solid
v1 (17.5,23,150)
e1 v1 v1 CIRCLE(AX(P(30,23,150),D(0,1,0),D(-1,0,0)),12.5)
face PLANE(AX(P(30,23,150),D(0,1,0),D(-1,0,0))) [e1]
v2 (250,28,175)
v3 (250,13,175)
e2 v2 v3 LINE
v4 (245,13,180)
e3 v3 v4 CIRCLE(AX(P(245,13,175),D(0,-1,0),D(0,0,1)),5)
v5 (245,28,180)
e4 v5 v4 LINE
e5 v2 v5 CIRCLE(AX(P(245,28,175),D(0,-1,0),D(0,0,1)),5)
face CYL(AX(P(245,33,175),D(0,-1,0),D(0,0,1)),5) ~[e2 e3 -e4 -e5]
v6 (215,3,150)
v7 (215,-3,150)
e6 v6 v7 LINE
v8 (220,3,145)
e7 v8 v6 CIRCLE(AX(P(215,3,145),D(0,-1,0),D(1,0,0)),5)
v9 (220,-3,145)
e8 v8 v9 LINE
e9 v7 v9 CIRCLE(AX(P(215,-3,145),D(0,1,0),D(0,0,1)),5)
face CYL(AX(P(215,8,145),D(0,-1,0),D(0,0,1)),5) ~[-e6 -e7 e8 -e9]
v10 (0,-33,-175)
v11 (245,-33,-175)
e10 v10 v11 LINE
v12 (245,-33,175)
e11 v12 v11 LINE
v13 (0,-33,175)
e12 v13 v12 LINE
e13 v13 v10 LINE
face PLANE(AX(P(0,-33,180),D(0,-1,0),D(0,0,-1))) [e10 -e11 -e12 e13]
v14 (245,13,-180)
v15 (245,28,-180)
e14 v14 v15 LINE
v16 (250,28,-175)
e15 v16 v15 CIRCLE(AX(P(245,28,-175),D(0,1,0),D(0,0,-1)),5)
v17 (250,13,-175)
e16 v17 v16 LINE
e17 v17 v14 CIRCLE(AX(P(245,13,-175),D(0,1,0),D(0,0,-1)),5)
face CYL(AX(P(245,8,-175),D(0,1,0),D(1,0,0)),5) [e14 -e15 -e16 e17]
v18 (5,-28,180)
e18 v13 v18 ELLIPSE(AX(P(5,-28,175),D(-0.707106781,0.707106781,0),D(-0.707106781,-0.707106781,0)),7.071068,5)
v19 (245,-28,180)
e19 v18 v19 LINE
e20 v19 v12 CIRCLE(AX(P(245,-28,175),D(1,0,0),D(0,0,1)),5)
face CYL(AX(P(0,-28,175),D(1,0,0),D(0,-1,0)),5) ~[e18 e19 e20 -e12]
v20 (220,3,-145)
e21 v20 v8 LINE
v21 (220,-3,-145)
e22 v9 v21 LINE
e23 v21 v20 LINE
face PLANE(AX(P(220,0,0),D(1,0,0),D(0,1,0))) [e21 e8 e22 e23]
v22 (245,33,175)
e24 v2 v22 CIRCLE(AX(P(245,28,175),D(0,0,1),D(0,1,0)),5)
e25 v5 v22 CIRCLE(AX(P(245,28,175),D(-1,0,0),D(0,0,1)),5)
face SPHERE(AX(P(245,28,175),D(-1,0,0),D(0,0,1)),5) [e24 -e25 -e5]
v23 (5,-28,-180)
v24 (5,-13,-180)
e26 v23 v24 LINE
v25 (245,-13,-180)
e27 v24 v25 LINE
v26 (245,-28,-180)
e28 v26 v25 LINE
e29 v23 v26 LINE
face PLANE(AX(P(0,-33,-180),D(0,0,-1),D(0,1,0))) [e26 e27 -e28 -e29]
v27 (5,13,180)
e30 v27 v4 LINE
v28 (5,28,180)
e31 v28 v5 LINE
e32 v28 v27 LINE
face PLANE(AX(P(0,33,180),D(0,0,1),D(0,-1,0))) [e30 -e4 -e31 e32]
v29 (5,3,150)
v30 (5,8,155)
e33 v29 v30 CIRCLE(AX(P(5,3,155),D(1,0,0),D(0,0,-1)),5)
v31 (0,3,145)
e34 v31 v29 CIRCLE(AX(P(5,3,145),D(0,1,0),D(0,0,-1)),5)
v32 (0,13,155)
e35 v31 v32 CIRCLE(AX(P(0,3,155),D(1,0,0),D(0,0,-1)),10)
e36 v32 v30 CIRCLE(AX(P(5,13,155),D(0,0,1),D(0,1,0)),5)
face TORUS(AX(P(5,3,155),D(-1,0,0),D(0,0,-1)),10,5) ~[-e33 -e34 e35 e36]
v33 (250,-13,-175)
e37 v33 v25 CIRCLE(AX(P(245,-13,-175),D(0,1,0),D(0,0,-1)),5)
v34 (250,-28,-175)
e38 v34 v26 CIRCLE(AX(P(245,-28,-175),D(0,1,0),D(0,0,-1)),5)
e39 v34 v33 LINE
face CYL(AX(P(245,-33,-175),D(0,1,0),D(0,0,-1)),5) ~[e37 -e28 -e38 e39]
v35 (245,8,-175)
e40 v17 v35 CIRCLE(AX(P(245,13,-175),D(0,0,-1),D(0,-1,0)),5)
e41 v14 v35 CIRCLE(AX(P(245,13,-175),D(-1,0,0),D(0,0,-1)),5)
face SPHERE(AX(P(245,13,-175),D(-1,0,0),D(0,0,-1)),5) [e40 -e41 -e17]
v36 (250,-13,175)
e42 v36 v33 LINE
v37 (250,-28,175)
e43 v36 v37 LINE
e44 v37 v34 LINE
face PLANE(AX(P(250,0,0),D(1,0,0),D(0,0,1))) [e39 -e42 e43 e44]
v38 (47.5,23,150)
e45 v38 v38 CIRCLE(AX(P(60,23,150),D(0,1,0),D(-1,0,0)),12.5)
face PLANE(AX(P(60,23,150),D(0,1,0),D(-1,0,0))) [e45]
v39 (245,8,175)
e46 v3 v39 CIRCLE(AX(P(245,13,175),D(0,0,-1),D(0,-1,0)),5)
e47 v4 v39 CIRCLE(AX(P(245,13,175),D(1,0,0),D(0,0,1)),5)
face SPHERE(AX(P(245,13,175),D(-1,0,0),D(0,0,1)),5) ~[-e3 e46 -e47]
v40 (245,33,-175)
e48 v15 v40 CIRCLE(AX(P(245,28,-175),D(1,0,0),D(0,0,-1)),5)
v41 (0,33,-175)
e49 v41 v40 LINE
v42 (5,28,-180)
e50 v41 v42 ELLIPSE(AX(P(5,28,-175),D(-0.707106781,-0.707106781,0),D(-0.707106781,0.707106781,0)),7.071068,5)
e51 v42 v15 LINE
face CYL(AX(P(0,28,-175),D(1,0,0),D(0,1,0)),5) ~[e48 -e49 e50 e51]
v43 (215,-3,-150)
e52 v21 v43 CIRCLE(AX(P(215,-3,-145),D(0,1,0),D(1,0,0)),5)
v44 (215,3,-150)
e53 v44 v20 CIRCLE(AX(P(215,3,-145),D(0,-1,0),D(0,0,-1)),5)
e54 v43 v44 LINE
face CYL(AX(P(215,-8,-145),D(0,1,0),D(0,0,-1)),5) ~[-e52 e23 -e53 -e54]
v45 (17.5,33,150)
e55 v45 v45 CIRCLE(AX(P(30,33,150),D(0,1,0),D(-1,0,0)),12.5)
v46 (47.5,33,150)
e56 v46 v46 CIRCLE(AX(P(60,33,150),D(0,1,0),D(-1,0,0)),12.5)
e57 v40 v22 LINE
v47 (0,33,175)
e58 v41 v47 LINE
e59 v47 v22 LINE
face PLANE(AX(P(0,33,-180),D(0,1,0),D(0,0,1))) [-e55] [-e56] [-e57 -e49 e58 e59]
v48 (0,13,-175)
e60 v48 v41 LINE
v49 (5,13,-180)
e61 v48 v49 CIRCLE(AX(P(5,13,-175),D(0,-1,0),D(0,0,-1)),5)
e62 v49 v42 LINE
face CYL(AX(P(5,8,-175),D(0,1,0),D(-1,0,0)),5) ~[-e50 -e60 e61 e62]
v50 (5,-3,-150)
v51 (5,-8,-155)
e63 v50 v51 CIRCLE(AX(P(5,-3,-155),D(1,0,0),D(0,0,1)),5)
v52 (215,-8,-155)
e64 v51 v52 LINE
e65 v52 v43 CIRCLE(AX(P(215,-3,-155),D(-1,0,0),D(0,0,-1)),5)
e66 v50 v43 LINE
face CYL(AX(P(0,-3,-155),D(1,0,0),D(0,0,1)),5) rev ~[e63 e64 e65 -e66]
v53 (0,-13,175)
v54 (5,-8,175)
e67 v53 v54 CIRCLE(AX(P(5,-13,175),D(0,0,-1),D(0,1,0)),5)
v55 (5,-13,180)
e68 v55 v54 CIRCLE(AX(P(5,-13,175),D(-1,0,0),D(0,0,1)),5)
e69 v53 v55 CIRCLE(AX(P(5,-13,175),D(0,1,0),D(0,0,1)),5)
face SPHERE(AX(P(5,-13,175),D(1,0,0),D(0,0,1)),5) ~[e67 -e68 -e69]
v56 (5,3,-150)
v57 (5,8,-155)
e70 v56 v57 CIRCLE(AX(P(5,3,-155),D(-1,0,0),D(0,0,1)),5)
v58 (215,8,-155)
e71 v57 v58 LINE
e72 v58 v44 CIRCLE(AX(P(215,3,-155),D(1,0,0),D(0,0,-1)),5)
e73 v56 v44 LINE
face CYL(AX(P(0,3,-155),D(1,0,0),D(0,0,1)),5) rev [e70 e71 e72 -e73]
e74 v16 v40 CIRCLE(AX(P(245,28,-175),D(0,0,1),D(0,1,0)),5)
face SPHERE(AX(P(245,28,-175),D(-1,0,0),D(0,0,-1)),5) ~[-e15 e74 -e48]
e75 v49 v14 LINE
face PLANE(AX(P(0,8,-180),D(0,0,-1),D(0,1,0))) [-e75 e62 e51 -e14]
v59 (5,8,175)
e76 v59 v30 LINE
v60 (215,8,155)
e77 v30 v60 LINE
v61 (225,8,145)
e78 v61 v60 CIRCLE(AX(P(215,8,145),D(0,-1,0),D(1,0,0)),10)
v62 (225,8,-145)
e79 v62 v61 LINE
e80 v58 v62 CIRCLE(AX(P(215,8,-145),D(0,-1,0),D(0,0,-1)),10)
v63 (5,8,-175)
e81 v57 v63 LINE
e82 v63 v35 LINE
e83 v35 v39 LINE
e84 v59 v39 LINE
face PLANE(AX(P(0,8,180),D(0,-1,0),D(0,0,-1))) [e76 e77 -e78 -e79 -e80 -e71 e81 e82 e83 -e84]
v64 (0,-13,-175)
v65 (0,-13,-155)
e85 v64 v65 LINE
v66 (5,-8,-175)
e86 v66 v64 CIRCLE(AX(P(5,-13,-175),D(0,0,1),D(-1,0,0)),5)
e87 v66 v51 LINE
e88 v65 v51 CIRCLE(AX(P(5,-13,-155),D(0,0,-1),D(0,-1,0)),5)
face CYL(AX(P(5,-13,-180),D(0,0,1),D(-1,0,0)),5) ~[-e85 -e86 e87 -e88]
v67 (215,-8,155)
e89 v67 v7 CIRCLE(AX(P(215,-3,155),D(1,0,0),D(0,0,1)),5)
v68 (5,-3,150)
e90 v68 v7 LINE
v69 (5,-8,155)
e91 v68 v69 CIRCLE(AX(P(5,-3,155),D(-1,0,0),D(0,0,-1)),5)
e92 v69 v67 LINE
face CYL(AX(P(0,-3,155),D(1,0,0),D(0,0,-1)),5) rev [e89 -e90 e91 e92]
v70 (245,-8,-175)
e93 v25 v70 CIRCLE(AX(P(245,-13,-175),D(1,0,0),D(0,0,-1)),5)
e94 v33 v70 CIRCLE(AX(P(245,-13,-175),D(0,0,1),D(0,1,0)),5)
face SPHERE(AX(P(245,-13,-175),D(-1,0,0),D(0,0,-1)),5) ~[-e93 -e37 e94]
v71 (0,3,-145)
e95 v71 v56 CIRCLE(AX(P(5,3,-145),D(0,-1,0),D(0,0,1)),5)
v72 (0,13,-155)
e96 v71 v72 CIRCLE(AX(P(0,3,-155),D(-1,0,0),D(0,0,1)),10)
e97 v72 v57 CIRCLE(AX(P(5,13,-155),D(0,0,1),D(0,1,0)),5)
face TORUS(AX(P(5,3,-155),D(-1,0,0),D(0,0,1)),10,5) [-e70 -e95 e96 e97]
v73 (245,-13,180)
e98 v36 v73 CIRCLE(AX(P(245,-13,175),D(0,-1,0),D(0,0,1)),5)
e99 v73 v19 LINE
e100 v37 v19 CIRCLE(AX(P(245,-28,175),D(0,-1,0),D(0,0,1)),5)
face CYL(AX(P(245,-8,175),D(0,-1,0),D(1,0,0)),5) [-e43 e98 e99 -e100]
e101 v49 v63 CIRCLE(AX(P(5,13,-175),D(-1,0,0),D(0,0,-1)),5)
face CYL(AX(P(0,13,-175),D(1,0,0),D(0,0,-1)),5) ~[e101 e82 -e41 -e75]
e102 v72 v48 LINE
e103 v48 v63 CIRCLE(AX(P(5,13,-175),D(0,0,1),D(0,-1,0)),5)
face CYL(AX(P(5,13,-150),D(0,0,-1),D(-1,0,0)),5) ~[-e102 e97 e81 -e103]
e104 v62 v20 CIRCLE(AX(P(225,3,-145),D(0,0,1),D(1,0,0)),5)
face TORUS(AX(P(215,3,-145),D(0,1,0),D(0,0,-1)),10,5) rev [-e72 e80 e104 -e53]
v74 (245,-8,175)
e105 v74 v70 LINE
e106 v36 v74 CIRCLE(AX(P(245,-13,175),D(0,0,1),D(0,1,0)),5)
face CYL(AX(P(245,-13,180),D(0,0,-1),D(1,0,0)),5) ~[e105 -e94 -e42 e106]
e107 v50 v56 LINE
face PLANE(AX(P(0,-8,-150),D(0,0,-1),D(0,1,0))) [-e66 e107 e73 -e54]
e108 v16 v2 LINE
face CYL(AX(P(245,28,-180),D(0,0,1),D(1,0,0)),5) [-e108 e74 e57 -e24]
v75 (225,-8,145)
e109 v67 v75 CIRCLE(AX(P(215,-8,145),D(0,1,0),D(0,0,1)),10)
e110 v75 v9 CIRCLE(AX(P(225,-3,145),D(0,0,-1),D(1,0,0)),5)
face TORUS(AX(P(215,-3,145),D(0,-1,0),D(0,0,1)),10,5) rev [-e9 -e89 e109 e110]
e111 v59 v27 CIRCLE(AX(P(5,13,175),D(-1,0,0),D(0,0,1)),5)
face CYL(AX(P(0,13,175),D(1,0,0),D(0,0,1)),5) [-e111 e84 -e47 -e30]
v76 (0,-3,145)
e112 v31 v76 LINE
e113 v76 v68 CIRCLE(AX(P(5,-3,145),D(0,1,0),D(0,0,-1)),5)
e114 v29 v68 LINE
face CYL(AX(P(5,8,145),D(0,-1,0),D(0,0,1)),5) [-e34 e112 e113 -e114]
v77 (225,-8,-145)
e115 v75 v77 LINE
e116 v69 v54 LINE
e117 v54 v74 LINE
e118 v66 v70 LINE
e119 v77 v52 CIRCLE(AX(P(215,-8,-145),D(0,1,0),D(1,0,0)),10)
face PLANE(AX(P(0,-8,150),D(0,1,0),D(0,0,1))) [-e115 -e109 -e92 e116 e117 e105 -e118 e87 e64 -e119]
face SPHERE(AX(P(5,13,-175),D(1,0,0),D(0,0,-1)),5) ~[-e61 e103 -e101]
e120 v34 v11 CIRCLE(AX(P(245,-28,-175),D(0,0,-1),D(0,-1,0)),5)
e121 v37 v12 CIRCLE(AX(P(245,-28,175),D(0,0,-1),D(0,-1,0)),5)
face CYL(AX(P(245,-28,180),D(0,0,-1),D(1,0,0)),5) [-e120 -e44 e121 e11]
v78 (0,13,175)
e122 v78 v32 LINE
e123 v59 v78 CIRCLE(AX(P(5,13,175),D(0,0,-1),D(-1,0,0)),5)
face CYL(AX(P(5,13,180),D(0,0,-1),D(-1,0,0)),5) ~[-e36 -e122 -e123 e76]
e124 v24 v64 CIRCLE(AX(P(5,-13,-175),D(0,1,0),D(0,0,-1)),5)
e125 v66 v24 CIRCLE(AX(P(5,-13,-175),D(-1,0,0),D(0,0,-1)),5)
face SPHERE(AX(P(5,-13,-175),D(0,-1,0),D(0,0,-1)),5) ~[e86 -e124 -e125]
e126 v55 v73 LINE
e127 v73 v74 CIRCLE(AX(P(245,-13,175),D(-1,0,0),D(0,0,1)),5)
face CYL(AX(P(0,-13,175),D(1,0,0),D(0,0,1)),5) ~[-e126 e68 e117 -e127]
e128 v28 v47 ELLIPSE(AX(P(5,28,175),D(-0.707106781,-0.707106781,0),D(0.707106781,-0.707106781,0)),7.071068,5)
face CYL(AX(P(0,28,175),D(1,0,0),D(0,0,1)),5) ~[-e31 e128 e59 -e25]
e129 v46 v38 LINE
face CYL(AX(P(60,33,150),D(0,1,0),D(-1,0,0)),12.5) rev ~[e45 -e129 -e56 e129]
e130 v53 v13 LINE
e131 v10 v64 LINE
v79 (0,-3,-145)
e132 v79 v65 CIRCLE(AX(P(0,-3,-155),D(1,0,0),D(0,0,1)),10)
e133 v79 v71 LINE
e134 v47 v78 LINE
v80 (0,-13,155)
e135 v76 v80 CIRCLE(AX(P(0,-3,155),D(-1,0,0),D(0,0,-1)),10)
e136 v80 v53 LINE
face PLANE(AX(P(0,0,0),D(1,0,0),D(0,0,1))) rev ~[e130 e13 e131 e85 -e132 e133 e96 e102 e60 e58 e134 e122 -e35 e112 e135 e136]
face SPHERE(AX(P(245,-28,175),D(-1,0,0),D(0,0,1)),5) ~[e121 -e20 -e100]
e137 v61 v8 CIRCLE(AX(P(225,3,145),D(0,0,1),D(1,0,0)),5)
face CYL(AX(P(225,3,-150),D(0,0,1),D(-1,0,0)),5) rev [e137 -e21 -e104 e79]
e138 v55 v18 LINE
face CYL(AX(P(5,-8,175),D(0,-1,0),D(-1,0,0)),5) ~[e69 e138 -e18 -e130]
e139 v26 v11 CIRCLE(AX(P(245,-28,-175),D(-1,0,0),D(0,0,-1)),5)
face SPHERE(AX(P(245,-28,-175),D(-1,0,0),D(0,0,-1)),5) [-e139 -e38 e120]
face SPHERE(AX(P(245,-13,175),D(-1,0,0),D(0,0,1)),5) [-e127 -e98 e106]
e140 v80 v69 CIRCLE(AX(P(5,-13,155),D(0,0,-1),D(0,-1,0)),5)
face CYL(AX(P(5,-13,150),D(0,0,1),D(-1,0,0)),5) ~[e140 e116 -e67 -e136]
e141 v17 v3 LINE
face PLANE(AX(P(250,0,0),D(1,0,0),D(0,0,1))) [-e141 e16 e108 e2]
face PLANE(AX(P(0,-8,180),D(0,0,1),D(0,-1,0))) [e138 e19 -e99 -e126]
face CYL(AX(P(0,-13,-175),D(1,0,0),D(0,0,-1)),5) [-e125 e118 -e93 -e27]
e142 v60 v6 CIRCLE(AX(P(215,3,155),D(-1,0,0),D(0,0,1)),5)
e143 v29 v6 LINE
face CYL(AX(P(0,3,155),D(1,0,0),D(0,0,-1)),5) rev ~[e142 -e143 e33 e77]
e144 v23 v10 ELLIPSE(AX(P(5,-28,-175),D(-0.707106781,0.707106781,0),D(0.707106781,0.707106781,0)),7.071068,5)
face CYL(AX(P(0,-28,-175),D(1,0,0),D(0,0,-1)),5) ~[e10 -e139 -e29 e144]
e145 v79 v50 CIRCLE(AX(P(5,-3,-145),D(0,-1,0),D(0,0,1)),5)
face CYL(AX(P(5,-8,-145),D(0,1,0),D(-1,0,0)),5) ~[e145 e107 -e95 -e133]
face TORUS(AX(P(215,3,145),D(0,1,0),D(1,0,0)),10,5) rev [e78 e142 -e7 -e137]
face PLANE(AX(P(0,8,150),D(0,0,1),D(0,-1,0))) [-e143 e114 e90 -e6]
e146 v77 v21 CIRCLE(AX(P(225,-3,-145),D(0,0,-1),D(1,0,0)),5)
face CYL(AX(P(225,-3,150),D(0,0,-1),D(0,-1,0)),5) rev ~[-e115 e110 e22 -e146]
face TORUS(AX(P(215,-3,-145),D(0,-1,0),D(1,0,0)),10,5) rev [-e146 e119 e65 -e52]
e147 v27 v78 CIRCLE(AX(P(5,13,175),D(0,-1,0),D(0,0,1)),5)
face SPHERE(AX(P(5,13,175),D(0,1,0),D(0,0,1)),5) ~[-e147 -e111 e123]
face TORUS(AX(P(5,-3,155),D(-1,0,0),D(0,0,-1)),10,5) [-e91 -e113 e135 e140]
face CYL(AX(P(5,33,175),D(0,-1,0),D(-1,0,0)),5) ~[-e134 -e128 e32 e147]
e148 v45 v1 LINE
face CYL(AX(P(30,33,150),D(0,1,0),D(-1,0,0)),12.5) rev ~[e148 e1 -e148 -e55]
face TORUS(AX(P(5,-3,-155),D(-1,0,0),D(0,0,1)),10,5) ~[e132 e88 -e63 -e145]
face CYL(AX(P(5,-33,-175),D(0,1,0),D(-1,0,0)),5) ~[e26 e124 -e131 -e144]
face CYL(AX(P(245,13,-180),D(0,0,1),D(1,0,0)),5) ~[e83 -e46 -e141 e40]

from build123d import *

# Parameters (mm, degrees)
F3_R     = 12.5
F4_DEPTH = 10
F6_DEPTH = 30
F7_R     = 5


with BuildPart() as f2:
    # F2: sweep along a path in F1
    with BuildLine(Plane.XZ) as f2_path:
        Line((0, 0), (250, 0))
    # F0 (on Right) → F2 (sweep)
    with BuildSketch(Plane.YZ):
        Polygon((8, 150), (0, 150), (-8, 150), (-8, 180), (-33, 180), (-33, -180), (-8, -180), (-8, -150), (0, -150), (8, -150), (8, -180), (33, -180), (33, 180), (8, 180), align=None)
    sweep(path=f2_path.line)

    # F3 (on face) → F4 (cut)
    with BuildSketch(Plane(origin=(0, 33, 0), x_dir=(-1, 0, 0), z_dir=(0, 1, 0))):
        with Locations((-60, 150)):
            Circle(F3_R)
        with Locations((-30, 150)):
            Circle(F3_R)
    extrude(amount=-F4_DEPTH, mode=Mode.SUBTRACT)

    # F5 (on face) → F6 (cut)
    with BuildSketch(Plane.YZ.offset(250)):
        Polygon((8, 150), (0, 150), (-8, 150), (-8, -150), (0, -150), (8, -150), align=None)
    extrude(amount=-F6_DEPTH, mode=Mode.SUBTRACT)

    # F7
    f7_edges = [f2.edges().sort_by_distance(p)[0] for p in [
        (110, 8, 150),
        (220, 0, 150),
        (110, -8, 150),
        (0, 0, 150),
        (110, -8, -150),
        (220, 0, -150),
        (110, 8, -150),
        (0, 0, -150),
        (125, 8, -180),
        (0, 20.5, -180),
        (125, 33, -180),
        (250, 20.5, -180),
        (125, 33, 180),
        (0, 20.5, 180),
        (125, 8, 180),
        (250, 20.5, 180),
        (125, -8, 180),
        (0, -20.5, 180),
        (125, -33, 180),
        (250, -20.5, 180),
        (125, -33, -180),
        (0, -20.5, -180),
        (125, -8, -180),
        (250, -20.5, -180),
        (0, -8, 165),
        (0, -8, -165),
        (0, 8, -165),
        (0, 8, 165),
        (250, 8, 0),
        (250, 33, 0),
        (250, -8, 0),
        (250, -33, 0),
        (220, -8, 0),
        (220, 8, 0),
    ]]
    fillet(f7_edges, radius=F7_R)


solid = f2.part
